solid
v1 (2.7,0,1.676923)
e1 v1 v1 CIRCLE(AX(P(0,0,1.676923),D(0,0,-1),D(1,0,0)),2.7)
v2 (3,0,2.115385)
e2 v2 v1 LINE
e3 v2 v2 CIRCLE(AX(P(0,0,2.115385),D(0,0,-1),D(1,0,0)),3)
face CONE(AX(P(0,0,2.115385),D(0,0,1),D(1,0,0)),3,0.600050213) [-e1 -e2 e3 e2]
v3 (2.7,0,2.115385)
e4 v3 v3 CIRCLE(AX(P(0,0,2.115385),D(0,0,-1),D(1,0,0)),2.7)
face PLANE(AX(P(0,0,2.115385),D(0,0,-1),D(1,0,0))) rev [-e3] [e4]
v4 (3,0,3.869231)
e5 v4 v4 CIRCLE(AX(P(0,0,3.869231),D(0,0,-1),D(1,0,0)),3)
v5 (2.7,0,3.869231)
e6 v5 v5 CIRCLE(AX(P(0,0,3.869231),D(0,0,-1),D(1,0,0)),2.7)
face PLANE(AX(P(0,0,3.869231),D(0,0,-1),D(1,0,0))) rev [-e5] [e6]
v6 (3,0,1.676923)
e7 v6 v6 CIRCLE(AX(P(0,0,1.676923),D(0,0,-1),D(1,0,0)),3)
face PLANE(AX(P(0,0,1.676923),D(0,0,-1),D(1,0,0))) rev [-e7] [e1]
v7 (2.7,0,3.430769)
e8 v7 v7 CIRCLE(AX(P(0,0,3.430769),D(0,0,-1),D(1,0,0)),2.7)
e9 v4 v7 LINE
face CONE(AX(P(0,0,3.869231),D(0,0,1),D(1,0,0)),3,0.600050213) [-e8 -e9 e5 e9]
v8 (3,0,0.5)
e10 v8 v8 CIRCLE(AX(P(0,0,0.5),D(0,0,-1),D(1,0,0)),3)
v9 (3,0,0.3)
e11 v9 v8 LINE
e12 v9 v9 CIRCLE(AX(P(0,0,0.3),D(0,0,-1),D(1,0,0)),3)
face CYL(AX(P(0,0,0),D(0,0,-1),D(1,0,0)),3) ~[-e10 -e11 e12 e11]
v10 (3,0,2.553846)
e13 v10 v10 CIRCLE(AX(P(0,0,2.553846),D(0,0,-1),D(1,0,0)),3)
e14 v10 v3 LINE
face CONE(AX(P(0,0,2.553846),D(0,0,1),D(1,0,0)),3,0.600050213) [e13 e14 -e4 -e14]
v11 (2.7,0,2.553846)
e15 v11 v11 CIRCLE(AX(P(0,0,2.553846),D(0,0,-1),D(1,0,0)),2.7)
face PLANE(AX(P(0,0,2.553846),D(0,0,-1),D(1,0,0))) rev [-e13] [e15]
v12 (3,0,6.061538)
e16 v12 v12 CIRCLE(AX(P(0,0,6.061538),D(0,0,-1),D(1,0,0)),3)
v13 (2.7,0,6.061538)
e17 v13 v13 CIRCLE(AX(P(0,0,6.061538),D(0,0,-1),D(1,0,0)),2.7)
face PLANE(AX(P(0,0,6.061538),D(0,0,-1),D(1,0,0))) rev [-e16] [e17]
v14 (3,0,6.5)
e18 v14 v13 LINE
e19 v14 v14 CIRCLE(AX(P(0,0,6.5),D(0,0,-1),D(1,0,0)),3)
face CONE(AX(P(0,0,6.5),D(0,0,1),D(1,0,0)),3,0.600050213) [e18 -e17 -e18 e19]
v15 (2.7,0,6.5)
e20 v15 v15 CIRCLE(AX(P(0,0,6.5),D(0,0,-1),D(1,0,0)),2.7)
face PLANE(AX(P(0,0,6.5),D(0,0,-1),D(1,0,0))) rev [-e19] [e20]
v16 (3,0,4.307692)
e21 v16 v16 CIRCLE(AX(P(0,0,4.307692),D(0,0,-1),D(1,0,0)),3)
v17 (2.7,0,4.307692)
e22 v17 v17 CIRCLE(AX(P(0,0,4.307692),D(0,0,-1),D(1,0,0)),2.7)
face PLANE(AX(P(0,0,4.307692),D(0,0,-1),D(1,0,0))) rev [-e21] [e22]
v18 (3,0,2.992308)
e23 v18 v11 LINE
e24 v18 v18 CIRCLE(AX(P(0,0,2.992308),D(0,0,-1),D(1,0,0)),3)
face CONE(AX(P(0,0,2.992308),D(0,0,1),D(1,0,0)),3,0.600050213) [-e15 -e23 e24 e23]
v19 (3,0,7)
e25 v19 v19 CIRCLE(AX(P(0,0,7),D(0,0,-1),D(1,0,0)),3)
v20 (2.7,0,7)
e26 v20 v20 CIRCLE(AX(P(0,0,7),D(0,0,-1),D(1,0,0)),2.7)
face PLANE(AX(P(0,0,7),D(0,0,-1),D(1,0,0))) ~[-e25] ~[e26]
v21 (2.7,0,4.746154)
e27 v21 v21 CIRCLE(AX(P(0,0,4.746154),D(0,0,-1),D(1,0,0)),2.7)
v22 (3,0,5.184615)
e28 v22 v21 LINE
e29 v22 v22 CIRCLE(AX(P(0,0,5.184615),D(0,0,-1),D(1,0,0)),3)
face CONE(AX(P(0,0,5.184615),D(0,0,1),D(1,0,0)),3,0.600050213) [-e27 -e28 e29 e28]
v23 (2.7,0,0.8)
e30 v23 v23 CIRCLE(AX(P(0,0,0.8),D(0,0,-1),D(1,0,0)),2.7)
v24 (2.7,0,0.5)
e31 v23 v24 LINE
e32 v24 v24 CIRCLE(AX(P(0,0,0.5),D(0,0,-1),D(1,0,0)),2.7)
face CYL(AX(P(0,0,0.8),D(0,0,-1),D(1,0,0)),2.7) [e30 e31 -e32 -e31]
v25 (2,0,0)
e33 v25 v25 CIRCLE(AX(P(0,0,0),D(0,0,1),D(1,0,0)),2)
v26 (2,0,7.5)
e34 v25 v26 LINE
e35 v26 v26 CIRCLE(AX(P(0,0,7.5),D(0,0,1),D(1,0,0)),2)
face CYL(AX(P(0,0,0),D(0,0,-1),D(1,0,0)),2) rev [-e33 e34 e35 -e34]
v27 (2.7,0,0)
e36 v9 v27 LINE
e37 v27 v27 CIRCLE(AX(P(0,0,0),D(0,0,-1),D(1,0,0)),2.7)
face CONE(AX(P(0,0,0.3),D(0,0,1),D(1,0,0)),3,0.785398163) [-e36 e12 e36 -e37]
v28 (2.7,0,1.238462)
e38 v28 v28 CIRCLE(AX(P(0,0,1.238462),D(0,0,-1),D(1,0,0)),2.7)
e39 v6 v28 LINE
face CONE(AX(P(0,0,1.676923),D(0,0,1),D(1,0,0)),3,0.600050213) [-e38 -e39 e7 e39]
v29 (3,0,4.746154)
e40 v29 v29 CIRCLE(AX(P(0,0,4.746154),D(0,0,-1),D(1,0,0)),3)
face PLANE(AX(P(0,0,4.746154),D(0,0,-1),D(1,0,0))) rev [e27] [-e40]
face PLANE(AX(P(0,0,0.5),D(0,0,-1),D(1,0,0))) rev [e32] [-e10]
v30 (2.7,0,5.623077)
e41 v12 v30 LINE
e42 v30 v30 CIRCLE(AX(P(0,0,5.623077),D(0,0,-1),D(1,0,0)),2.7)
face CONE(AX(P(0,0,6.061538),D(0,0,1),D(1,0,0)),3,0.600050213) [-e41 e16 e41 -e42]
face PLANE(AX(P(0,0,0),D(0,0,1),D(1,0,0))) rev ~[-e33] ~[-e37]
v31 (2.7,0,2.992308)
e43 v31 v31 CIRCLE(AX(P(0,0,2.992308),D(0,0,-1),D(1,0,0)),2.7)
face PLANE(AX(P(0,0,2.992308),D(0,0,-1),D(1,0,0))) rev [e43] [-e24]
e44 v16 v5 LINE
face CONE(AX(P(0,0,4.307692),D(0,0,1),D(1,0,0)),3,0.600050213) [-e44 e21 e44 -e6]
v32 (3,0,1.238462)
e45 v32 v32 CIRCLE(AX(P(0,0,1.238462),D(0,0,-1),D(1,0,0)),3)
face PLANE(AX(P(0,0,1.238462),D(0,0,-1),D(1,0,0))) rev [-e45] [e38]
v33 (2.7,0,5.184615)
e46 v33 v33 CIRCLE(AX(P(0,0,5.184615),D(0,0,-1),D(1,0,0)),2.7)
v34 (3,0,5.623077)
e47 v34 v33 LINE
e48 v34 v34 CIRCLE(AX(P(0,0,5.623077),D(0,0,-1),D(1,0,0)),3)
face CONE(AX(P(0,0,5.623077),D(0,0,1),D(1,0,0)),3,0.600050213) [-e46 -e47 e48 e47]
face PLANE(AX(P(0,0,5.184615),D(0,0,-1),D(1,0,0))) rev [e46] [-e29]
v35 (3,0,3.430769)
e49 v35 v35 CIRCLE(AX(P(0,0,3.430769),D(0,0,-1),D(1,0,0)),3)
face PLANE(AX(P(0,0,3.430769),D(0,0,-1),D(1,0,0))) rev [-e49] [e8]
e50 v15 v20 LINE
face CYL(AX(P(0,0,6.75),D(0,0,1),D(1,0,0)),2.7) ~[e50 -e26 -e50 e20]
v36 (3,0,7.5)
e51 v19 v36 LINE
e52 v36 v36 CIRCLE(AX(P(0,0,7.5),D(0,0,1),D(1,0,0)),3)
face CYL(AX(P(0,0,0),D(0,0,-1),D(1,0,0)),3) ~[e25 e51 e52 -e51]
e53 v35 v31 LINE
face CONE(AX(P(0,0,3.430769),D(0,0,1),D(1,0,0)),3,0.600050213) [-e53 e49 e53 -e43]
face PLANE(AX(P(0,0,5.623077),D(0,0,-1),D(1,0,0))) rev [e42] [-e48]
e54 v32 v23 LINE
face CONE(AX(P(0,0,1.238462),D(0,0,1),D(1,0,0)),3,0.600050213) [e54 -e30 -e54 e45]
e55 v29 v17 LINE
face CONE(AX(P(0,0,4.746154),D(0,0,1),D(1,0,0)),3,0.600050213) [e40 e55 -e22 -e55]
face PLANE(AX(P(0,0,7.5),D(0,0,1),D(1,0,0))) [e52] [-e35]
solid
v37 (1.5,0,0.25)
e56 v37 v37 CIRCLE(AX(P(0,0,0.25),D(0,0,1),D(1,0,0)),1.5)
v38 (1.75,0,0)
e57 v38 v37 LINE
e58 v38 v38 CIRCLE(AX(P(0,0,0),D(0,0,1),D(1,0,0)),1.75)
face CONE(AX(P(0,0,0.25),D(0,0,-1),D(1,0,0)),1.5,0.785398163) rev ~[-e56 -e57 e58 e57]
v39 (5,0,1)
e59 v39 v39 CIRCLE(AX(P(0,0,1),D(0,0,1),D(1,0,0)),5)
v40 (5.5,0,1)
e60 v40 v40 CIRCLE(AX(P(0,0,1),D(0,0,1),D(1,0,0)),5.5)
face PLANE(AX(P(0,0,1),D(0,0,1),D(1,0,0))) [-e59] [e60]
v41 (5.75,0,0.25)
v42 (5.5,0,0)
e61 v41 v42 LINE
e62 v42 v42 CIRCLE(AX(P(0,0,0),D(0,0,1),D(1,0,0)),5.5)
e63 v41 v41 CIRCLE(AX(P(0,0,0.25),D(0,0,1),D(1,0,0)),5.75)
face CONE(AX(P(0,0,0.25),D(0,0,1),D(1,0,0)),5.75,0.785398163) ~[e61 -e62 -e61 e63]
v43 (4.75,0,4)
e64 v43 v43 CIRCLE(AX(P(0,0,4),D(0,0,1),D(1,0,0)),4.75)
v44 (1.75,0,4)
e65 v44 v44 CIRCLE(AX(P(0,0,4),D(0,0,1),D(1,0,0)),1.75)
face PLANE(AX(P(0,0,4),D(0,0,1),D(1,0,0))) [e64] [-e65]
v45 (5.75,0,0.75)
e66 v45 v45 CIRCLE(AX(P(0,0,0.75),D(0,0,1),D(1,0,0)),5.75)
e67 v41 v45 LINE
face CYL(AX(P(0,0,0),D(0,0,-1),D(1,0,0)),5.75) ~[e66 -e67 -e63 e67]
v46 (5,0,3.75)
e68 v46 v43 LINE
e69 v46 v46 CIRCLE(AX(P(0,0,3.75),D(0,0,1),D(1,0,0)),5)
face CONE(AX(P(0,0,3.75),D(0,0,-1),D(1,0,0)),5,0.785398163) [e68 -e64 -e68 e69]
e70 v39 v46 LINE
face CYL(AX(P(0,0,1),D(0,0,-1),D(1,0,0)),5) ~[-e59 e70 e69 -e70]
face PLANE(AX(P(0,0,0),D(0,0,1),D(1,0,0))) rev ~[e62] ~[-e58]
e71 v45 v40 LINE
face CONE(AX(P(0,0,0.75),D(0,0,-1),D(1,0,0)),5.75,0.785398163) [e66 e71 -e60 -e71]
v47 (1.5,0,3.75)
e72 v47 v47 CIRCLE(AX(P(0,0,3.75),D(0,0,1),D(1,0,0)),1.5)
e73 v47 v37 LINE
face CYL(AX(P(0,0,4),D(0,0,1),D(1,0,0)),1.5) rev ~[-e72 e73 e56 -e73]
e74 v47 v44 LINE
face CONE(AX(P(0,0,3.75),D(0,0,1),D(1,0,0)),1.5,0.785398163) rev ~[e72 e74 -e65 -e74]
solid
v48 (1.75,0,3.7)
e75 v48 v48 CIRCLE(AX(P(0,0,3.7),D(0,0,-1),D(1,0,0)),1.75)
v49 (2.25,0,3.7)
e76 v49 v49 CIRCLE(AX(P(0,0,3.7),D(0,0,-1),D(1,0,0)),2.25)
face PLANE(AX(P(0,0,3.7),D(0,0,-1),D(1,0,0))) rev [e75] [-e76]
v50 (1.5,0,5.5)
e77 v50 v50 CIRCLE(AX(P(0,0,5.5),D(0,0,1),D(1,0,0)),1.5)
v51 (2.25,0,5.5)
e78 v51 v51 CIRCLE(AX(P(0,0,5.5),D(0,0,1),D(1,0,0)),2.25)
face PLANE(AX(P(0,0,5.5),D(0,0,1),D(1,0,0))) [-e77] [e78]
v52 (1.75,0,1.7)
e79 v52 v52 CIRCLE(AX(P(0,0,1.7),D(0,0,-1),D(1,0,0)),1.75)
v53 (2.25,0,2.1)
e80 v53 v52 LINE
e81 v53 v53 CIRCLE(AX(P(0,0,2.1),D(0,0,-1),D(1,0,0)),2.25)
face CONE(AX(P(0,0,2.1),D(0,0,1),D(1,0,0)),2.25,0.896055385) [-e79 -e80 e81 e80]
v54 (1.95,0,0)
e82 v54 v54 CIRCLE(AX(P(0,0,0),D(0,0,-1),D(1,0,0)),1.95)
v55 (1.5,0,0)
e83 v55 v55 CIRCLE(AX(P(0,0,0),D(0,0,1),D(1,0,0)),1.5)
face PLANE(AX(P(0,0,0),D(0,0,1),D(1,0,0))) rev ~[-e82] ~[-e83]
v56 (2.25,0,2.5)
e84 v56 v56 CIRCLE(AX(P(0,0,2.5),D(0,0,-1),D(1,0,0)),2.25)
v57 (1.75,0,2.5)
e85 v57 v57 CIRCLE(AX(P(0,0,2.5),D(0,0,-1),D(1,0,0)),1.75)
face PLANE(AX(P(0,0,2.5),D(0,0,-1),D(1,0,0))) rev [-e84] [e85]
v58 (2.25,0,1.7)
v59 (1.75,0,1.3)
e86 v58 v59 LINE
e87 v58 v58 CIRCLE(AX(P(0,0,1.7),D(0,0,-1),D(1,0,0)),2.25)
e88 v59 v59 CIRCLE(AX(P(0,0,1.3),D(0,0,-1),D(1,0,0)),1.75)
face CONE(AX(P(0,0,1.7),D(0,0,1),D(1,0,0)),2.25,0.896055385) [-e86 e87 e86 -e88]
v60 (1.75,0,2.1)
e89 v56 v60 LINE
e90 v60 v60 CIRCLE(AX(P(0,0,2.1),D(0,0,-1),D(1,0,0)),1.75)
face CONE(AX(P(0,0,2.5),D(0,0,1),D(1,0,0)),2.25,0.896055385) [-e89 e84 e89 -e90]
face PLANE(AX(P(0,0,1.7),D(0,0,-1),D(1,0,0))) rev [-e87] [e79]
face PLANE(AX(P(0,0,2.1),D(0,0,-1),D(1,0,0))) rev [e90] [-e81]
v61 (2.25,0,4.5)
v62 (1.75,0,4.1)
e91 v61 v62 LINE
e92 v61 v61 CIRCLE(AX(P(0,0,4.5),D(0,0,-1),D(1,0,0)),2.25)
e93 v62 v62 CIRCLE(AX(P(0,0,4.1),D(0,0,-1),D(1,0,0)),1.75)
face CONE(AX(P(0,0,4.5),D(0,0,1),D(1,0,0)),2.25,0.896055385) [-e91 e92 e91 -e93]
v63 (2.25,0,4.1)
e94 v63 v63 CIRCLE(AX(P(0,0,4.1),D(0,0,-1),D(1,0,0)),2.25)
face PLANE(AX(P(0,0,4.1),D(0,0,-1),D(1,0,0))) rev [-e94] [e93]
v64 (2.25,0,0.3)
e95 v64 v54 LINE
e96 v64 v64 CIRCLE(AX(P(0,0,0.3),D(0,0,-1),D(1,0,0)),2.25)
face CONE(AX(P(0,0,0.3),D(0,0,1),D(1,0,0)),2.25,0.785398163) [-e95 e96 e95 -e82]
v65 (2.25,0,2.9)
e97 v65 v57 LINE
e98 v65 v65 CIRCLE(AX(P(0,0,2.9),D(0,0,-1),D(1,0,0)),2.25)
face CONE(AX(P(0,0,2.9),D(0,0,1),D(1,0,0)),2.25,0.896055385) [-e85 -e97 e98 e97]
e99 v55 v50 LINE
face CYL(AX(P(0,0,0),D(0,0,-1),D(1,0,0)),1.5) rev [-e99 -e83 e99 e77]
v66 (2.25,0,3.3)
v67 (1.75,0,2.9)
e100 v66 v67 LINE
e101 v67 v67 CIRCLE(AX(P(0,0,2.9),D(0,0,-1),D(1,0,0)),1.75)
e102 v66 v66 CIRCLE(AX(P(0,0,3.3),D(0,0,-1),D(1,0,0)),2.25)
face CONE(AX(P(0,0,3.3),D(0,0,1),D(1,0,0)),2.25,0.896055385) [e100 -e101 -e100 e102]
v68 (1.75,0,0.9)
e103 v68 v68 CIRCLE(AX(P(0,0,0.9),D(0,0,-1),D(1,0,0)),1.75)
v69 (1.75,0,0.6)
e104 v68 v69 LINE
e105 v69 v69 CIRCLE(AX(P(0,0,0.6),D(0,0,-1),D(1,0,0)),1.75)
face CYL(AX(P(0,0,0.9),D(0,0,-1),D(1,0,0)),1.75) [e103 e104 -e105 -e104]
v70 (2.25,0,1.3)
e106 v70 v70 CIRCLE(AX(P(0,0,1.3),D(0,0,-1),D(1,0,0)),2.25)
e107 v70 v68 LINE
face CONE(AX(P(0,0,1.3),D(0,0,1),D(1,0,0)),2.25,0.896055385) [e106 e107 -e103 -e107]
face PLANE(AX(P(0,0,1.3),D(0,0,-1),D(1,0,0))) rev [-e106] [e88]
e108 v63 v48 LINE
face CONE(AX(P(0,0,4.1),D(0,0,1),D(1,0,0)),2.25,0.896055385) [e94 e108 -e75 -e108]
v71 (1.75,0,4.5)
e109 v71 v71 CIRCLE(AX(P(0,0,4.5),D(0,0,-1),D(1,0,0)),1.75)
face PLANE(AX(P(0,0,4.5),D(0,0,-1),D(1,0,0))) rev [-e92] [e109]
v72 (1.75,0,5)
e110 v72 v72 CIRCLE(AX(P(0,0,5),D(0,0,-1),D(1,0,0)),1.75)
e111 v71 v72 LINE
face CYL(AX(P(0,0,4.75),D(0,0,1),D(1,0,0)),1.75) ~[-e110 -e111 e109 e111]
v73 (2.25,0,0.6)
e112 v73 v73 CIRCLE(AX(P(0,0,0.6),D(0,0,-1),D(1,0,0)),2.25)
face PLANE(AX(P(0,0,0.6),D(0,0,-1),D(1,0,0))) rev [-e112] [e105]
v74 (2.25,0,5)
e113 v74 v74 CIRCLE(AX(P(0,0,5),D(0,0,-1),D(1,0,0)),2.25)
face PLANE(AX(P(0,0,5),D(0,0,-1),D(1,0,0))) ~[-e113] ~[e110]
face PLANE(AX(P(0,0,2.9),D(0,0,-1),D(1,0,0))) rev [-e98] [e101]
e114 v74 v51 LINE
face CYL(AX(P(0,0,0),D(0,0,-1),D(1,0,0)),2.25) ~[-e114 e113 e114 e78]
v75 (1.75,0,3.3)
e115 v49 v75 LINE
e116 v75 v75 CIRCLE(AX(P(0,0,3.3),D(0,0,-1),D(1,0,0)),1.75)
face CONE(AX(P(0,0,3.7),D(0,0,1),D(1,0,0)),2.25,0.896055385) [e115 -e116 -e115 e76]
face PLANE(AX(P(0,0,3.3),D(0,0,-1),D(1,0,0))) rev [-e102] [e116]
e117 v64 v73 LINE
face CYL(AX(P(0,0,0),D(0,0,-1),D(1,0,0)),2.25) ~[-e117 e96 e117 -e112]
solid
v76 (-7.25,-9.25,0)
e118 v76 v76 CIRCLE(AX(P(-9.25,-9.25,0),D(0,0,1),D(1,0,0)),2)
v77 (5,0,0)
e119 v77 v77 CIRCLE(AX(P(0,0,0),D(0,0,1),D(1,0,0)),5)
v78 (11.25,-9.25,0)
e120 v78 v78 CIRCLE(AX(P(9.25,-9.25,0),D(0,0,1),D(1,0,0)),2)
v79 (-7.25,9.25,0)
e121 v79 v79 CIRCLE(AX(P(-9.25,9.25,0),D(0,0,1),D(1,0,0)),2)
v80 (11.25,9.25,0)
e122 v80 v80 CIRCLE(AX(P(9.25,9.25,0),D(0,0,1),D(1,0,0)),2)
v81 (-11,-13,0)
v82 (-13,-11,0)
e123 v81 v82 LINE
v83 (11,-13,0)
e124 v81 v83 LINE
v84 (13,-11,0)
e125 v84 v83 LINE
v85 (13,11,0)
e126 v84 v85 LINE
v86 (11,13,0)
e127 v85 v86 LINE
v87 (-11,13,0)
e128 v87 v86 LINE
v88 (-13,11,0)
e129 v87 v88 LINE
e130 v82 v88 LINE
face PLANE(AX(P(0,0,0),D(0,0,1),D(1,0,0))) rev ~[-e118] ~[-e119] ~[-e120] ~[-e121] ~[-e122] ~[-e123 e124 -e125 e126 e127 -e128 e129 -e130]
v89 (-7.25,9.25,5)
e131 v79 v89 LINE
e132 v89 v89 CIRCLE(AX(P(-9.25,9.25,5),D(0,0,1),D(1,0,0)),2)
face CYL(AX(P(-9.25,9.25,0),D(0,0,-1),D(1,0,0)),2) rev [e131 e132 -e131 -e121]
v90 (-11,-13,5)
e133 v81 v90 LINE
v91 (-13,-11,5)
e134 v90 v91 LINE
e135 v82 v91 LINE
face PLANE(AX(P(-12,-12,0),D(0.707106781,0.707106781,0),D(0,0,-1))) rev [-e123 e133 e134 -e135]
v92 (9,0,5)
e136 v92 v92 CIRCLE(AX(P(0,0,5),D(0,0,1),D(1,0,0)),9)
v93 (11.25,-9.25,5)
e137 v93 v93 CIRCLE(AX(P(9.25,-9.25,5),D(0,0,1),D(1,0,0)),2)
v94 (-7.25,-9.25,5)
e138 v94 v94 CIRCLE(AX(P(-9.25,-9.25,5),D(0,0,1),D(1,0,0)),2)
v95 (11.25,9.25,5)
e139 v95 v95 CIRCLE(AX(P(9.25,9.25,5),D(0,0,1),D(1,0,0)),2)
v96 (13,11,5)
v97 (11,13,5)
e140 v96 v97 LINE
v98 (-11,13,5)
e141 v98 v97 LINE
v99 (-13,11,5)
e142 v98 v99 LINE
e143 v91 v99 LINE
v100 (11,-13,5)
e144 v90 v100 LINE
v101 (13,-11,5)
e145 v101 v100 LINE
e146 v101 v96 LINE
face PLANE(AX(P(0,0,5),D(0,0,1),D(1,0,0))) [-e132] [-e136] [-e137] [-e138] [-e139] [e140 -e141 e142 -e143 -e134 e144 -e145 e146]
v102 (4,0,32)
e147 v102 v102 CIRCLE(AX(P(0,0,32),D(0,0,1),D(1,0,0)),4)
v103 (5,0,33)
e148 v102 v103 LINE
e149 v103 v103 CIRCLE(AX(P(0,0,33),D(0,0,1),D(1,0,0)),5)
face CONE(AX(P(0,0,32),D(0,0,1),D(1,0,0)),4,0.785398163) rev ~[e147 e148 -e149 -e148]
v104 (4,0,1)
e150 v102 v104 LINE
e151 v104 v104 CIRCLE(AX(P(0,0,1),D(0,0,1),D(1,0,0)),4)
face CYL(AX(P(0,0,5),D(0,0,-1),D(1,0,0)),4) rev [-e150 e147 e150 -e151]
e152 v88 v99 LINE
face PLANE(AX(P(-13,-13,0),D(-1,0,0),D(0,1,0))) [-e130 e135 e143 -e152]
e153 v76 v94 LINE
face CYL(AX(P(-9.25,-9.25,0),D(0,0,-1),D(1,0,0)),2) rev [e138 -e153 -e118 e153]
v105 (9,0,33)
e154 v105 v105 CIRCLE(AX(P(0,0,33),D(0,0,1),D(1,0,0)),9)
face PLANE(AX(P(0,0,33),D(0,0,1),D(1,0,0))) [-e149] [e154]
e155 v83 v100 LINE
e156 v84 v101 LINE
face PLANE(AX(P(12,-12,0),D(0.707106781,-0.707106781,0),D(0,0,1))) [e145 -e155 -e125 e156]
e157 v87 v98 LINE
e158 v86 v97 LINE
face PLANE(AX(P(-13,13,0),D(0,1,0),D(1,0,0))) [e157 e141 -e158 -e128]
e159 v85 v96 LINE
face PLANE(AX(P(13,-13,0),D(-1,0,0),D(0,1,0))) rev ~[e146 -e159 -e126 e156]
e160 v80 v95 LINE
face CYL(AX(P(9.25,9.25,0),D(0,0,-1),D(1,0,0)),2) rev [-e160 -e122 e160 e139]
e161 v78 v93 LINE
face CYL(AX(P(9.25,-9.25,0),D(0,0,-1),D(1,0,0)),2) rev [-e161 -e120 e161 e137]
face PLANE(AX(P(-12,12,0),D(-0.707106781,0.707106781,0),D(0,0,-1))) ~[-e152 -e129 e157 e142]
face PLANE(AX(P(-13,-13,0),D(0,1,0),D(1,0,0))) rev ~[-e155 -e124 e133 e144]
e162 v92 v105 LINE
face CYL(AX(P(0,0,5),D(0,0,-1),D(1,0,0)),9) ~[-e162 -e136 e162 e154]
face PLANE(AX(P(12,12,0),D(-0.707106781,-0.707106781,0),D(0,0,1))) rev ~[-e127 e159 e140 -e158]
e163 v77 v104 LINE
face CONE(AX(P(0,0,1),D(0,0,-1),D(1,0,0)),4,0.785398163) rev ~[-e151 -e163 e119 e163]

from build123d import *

# Parameters (mm, degrees)
F0_R      = 2.25
F0_R_2    = 1.5
F1_DEPTH  = 5.5
F2_W      = 0.5
F2_H      = 0.5
F4_R      = 3
F4_R_2    = 2
F5_DEPTH  = 7.5
F6_W      = 0.3
F6_H      = 0.5
F8_W      = 26
F8_H      = 26
F8_R      = 2
F8_R_2    = 4
F9_DEPTH  = 5
F10_R     = 9
F10_R_2   = 4
F11_DEPTH = 28
F12_SIZE  = 2
F13_SIZE  = 1
F14_R     = 5.75
F15_DEPTH = 1
F16_R     = 5
F17_DEPTH = 3
F18_R     = 1.5
F19_DEPTH = 4.001
F20_SIZE  = 0.25


with BuildPart() as f1:
    # F0 (on Top) → F1 (new body)
    with BuildSketch(Plane.XY):
        Circle(F0_R)
        Circle(F0_R_2, mode=Mode.SUBTRACT)
    extrude(amount=F1_DEPTH)

    # F2 (on Front) → F3 (revolve, cut)
    with BuildSketch(Plane.XZ):
        with Locations((2, 4.75)):
            Rectangle(F2_W, F2_H)
        Polygon((2.25, 4.1), (2.25, 4.5), (1.75, 4.1), align=None)
        Polygon((2.25, 3.7), (2.25, 4.1), (1.75, 3.7), align=None)
        Polygon((2.25, 3.3), (2.25, 3.7), (1.75, 3.3), align=None)
        Polygon((2.25, 2.9), (2.25, 3.3), (1.75, 2.9), align=None)
        Polygon((2.25, 2.5), (2.25, 2.9), (1.75, 2.5), align=None)
        Polygon((2.25, 2.1), (2.25, 2.5), (1.75, 2.1), align=None)
        Polygon((2.25, 1.7), (2.25, 2.1), (1.75, 1.7), align=None)
        Polygon((2.25, 1.3), (2.25, 1.7), (1.75, 1.3), align=None)
        Polygon((2.25, 0.6), (2.25, 1.3), (1.75, 0.9), (1.75, 0.6), align=None)
        Polygon((2.25, 0), (2.25, 0.3), (1.95, 0), align=None)
    revolve(axis=Axis((0, 0, 0), (0, 0, -1)), mode=Mode.SUBTRACT)


with BuildPart() as f5:
    # F4 (on Top) → F5 (new body)
    with BuildSketch(Plane.XY):
        Circle(F4_R)
        Circle(F4_R_2, mode=Mode.SUBTRACT)
    extrude(amount=F5_DEPTH)

    # F6 (on Front) → F7 (revolve, cut)
    with BuildSketch(Plane.XZ):
        with Locations((2.85, 6.75)):
            Rectangle(F6_W, F6_H)
        Polygon((3, 6.0615384615), (3, 6.5), (2.7, 6.0615384615), align=None)
        Polygon((3, 5.6230769231), (3, 6.0615384615), (2.7, 5.6230769231), align=None)
        Polygon((3, 5.1846153846), (3, 5.6230769231), (2.7, 5.1846153846), align=None)
        Polygon((3, 4.7461538462), (3, 5.1846153846), (2.7, 4.7461538462), align=None)
        Polygon((3, 4.3076923077), (3, 4.7461538462), (2.7, 4.3076923077), align=None)
        Polygon((3, 3.8692307692), (3, 4.3076923077), (2.7, 3.8692307692), align=None)
        Polygon((3, 3.4307692308), (3, 3.8692307692), (2.7, 3.4307692308), align=None)
        Polygon((3, 2.5538461538), (3, 2.9923076923), (2.7, 2.5538461538), align=None)
        Polygon((3, 2.9923076923), (3, 3.4307692308), (2.7, 2.9923076923), align=None)
        Polygon((3, 2.1153846154), (3, 2.5538461538), (2.7, 2.1153846154), align=None)
        Polygon((3, 1.6769230769), (3, 2.1153846154), (2.7, 1.6769230769), align=None)
        Polygon((3, 1.2384615385), (3, 1.6769230769), (2.7, 1.2384615385), align=None)
        Polygon((3, 0.5), (3, 1.2384615385), (2.7, 0.8), (2.7, 0.5), align=None)
        Polygon((3, 0), (3, 0.3), (2.7, 0), align=None)
    revolve(axis=Axis((0, 0, 0), (0, 0, -1)), mode=Mode.SUBTRACT)


with BuildPart() as f9:
    # F8 (on Top) → F9 (new body)
    with BuildSketch(Plane.XY):
        Rectangle(F8_W, F8_H)
        with Locations((-9.25, -9.25)):
            Circle(F8_R, mode=Mode.SUBTRACT)
        with Locations((9.25, -9.25)):
            Circle(F8_R, mode=Mode.SUBTRACT)
        with Locations((-9.25, 9.25)):
            Circle(F8_R, mode=Mode.SUBTRACT)
        Circle(F8_R_2, mode=Mode.SUBTRACT)
        with Locations((9.25, 9.25)):
            Circle(F8_R, mode=Mode.SUBTRACT)
    extrude(amount=F9_DEPTH)

    # F10 (on face) → F11 (join)
    with BuildSketch(Plane.XY.offset(5)):
        Circle(F10_R)
        Circle(F10_R_2, mode=Mode.SUBTRACT)
    extrude(amount=F11_DEPTH)

    # F12
    f12_edges = [f9.edges().sort_by_distance(p)[0] for p in [
        (-13, -13, 2.5),
        (13, -13, 2.5),
        (13, 13, 2.5),
        (-13, 13, 2.5),
    ]]
    chamfer(f12_edges, length=F12_SIZE)

    # F13
    f13_edges = [f9.edges().sort_by_distance(p)[0] for p in [
        (-4, 0, 33),
        (-4, 0, 0),
    ]]
    chamfer(f13_edges, length=F13_SIZE)


with BuildPart() as f15:
    # F14 (on Top) → F15 (new body)
    with BuildSketch(Plane.XY):
        Circle(F14_R)
    extrude(amount=F15_DEPTH)

    # F16 (on face) → F17 (join)
    with BuildSketch(Plane.XY.offset(1)):
        Circle(F16_R)
    extrude(amount=F17_DEPTH)

    # F18 (on face) → F19 (cut, through all)
    with BuildSketch(Plane.XY.offset(4)):
        Circle(F18_R)
    extrude(amount=-F19_DEPTH, mode=Mode.SUBTRACT)

    # F20
    f20_edges = [f15.edges().sort_by_distance(p)[0] for p in [
        (-5, 0, 4),
        (-1.5, 0, 4),
        (-5.75, 0, 1),
        (-5.75, 0, 0),
        (-1.5, 0, 0),
    ]]
    chamfer(f20_edges, length=F20_SIZE)


solid = Compound([f1.part, f5.part, f9.part, f15.part])
